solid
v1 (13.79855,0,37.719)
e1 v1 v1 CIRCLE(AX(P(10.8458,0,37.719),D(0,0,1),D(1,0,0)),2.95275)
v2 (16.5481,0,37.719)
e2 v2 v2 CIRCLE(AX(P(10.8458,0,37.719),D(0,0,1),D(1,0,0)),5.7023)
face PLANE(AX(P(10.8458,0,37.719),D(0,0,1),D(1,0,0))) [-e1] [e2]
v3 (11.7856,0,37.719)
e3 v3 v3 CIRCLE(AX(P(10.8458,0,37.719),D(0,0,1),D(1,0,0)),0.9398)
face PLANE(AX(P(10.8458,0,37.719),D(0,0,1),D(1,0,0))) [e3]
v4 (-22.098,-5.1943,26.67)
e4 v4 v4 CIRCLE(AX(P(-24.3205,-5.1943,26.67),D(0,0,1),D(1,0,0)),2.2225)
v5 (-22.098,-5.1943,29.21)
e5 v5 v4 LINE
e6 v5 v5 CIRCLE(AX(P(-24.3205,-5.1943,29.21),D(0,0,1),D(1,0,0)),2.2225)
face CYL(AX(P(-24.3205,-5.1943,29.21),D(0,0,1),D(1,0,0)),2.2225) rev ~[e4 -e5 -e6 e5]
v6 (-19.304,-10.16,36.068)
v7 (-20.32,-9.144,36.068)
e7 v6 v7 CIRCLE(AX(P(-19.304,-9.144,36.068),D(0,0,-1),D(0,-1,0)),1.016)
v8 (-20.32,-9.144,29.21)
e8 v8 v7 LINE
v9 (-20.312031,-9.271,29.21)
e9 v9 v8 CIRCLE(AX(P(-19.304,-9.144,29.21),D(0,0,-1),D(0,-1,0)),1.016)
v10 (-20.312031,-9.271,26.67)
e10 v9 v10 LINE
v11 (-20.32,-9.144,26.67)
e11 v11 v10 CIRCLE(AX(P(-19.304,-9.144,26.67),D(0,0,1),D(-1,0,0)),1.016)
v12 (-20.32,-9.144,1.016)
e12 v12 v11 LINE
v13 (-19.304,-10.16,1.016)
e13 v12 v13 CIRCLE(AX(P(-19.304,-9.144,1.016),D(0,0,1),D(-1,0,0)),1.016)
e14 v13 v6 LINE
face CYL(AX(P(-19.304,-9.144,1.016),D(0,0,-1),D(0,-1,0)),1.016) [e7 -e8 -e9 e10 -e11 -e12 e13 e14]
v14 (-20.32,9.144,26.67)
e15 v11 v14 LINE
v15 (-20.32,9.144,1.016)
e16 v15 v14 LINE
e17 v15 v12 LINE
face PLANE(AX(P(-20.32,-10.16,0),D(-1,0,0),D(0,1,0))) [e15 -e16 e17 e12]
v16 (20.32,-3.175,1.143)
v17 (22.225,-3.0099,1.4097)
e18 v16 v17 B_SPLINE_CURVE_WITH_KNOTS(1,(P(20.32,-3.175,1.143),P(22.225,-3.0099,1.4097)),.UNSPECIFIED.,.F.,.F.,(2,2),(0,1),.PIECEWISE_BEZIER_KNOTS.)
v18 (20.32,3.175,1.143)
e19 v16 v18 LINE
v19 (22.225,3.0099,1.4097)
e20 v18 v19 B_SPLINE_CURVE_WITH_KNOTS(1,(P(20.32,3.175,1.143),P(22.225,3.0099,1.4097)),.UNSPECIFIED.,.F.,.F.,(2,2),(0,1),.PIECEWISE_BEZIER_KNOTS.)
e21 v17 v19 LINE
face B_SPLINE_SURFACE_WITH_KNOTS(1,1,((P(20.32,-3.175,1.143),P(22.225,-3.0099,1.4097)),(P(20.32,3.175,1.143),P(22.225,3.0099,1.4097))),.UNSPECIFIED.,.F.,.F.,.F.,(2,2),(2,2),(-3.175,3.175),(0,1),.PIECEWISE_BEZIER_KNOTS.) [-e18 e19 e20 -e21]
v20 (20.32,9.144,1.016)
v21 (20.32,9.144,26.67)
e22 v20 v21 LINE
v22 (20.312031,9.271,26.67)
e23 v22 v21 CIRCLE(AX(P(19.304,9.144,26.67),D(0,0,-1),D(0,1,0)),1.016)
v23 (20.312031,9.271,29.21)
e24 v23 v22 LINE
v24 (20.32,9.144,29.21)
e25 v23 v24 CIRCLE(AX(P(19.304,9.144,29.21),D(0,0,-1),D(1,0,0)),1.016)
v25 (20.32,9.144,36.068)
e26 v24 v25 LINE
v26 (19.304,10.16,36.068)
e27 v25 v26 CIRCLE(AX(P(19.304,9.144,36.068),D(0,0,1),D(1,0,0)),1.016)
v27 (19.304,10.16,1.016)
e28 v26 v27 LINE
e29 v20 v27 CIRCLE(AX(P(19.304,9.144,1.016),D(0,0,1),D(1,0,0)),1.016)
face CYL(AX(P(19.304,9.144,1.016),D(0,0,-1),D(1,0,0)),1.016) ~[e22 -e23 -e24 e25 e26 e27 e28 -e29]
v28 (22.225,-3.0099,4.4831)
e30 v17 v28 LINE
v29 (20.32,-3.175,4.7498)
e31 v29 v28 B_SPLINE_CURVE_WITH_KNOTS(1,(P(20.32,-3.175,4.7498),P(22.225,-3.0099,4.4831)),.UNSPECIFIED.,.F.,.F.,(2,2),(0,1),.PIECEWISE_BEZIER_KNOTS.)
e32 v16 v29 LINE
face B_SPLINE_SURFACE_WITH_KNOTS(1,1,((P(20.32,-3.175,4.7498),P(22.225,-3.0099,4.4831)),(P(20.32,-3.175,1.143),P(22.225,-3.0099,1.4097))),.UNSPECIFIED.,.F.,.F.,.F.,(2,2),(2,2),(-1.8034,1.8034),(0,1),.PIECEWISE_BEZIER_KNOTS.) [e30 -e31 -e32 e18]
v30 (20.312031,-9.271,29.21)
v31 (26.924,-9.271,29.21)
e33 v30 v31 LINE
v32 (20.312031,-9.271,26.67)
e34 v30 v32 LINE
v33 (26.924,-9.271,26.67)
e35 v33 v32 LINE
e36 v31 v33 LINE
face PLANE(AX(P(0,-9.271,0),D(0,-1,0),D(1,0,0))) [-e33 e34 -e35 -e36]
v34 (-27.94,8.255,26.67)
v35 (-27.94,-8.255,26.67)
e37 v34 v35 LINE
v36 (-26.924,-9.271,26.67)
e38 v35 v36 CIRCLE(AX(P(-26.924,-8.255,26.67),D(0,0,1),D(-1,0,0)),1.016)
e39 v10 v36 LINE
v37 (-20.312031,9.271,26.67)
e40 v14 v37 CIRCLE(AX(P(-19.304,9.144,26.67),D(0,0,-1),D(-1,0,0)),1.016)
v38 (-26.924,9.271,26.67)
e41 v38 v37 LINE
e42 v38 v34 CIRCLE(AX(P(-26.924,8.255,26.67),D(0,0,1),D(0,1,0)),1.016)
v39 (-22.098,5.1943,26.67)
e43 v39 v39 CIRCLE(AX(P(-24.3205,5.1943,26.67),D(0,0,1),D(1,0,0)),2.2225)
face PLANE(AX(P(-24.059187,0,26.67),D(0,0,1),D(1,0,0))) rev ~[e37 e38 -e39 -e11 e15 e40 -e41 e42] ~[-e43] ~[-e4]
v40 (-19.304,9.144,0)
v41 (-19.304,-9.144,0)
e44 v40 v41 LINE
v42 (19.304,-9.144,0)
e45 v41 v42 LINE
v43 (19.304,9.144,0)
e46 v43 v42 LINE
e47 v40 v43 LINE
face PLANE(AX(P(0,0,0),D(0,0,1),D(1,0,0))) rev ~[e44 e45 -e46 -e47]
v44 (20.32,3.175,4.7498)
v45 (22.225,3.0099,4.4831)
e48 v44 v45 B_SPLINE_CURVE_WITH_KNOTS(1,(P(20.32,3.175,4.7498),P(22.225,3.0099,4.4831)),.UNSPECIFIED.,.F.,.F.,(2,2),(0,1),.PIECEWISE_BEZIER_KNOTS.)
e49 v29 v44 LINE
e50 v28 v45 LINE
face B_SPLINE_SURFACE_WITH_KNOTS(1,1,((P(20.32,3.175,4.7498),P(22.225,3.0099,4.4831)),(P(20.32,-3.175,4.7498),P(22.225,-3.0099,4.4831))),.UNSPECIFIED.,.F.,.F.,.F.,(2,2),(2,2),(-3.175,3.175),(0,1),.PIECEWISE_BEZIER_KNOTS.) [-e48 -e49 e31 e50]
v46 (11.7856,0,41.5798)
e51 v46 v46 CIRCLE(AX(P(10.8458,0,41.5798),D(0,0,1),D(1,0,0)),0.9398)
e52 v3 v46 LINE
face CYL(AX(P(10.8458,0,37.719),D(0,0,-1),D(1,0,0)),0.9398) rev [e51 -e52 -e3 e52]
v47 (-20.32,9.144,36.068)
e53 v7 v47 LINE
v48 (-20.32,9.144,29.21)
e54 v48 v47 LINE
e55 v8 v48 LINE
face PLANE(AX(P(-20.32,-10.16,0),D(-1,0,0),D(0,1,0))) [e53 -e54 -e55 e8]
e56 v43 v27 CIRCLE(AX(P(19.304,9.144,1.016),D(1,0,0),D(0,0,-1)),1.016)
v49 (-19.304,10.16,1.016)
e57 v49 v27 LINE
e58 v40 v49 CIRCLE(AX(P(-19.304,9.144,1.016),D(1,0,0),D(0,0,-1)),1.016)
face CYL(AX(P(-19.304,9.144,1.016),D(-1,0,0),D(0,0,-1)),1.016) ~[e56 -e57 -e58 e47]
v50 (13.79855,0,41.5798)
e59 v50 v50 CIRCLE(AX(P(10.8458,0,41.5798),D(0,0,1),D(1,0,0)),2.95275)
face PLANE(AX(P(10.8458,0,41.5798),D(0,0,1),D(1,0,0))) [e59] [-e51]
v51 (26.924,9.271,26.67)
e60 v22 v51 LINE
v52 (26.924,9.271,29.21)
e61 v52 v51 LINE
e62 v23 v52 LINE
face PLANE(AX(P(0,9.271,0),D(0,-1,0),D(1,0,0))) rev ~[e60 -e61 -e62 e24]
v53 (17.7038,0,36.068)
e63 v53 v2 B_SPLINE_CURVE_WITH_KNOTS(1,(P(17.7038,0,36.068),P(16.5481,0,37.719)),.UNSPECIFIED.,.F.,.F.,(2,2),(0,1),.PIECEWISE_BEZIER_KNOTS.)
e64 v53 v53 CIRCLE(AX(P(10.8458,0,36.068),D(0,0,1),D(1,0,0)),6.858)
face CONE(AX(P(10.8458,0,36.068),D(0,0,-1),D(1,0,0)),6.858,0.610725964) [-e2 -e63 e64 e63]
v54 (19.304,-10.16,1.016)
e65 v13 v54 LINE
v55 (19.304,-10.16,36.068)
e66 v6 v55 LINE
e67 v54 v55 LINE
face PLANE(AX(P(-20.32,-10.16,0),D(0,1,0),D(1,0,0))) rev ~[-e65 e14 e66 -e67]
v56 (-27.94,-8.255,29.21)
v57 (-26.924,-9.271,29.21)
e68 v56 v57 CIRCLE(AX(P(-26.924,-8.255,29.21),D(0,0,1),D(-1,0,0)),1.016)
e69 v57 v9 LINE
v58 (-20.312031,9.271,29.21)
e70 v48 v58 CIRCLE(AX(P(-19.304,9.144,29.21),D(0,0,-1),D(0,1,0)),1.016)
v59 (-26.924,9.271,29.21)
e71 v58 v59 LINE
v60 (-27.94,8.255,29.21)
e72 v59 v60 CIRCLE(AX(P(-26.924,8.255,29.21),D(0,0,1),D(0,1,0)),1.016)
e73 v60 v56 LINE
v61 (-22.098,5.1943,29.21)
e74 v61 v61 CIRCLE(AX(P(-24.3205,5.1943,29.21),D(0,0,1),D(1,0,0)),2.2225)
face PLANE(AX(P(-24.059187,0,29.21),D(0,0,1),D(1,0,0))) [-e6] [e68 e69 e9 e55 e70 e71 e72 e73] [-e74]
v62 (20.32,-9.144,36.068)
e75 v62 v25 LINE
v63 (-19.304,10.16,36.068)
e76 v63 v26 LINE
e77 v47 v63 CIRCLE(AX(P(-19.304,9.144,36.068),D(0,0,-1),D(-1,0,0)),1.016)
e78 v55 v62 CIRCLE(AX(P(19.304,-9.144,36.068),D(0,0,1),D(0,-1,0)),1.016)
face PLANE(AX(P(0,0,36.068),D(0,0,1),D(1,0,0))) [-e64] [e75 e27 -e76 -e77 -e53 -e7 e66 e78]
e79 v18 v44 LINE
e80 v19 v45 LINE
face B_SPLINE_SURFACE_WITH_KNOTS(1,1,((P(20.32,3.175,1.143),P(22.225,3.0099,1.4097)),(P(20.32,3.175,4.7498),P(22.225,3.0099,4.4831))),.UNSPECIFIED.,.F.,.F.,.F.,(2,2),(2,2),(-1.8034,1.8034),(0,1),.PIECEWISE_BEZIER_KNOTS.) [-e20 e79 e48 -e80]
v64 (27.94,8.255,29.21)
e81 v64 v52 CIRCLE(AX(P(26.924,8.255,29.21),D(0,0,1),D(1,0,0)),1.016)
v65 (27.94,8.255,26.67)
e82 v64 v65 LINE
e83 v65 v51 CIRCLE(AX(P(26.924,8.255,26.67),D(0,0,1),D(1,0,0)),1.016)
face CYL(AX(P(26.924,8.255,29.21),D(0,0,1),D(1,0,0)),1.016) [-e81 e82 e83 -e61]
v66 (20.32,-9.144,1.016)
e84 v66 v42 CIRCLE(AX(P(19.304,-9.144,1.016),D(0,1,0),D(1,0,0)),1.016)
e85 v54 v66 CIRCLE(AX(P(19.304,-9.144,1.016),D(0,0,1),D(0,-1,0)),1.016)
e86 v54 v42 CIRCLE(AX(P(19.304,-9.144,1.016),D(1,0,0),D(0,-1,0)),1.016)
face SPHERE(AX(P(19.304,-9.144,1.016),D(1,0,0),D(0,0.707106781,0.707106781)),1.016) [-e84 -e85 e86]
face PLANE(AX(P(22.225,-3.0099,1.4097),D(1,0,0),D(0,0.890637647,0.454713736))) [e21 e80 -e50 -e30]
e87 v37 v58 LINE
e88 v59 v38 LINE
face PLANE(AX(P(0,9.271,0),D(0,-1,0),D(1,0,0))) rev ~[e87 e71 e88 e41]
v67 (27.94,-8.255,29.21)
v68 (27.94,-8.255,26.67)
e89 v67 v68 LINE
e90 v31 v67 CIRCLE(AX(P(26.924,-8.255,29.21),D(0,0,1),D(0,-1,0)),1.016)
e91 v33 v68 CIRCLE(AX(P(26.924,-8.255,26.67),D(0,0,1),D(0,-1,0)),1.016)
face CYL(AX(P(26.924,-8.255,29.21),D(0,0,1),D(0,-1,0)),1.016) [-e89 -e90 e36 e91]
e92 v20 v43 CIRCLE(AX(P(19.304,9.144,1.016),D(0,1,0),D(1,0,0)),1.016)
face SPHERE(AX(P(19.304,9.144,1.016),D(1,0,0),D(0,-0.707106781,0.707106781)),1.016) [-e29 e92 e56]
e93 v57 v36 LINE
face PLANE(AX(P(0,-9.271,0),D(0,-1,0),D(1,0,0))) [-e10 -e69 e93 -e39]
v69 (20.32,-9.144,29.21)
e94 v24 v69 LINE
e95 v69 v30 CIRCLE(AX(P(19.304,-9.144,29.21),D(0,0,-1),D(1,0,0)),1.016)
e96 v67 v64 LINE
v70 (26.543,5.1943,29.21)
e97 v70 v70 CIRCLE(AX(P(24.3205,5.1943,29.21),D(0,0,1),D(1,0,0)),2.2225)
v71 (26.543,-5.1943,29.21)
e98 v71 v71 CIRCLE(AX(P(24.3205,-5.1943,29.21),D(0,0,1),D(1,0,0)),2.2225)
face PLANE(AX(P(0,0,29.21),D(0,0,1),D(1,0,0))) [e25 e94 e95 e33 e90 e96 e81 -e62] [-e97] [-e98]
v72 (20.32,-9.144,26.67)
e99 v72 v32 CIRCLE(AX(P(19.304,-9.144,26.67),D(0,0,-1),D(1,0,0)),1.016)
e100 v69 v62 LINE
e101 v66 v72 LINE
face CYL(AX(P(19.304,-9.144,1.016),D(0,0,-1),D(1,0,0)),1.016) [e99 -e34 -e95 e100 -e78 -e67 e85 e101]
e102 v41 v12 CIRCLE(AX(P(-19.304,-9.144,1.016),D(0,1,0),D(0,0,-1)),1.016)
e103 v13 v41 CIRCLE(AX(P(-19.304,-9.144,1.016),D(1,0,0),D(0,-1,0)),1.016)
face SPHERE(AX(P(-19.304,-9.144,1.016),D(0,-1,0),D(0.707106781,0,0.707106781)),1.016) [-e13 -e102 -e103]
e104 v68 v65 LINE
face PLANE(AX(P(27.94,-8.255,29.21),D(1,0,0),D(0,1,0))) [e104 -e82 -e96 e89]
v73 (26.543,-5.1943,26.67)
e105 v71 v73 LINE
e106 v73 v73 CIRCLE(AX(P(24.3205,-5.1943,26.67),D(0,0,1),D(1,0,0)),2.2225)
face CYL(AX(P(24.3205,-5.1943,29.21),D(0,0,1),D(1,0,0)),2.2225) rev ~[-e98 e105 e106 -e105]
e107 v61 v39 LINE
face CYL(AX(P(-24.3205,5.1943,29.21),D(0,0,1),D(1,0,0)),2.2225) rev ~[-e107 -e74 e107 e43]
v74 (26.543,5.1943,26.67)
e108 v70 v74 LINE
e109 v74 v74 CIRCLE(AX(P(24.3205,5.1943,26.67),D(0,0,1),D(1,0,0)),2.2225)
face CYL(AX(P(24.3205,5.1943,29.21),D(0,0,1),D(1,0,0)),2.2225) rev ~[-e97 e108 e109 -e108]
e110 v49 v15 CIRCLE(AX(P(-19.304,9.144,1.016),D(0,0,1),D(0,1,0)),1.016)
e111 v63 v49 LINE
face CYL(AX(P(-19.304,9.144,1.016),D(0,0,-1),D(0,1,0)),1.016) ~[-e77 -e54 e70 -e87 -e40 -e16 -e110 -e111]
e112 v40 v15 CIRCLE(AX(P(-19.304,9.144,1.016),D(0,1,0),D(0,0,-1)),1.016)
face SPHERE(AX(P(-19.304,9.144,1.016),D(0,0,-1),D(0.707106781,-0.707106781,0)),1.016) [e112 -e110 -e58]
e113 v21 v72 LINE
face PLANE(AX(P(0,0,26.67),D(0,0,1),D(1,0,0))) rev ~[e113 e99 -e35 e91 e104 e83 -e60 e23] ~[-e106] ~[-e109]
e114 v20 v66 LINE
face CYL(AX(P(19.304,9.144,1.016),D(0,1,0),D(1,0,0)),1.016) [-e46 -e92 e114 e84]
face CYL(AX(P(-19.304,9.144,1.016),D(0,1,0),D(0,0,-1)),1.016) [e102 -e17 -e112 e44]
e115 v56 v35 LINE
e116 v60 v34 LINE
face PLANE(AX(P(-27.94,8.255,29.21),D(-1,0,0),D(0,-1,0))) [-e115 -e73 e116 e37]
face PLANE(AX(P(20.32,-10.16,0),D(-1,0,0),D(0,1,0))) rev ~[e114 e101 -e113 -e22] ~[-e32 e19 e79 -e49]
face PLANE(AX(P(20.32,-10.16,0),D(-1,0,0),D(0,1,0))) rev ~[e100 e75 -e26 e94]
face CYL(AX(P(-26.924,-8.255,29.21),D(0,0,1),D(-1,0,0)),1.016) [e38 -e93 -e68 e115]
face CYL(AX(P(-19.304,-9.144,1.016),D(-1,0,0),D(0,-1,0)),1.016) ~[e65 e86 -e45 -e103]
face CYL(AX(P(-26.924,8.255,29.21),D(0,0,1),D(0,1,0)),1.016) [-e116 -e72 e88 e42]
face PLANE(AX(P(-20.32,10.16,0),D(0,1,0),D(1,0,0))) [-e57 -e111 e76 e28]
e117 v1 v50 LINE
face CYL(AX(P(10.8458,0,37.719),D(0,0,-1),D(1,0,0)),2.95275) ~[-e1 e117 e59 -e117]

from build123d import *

# Parameters (mm, degrees)
F0_W           = 40.64
F0_H           = 20.32
F1_DEPTH       = 36.068
F2_W           = 6.35
F2_H           = 3.6068
F4_W           = 6.0198
F4_H           = 3.0734
F7_R           = 2.2225
F8_DEPTH       = 2.54
F9_R           = 6.858
F11_R          = 5.7023
F13_T1_DEPTH   = 38.608
F13_T3_DEPTH   = 18.288
F13_S7_W       = 1.016
F13_S7_H       = 1.016
F13_T8_DEPTH   = 1.016
F13_S13_W      = 1.016
F13_S13_H      = 1.016
F13_T14_DEPTH  = 1.016
F13_S19_W      = 1.016
F13_S19_H      = 1.016
F13_T20_DEPTH  = 1.016
F13_S25_W      = 1.016
F13_S25_H      = 1.016
F13_T26_DEPTH  = 1.016
F13_T32_DEPTH  = 37.592
F13_T38_DEPTH  = 37.592
F13_T44_DEPTH  = 37.592
F13_T51_DEPTH  = 37.592
F13_T57_DEPTH  = 37.592
F13_T63_DEPTH  = 37.592
F13_T69_DEPTH  = 37.592
F13_T75_DEPTH  = 37.592
F13_T82_DEPTH  = 37.592
F13_T88_DEPTH  = 37.592
F13_T94_DEPTH  = 37.592
F13_T100_DEPTH = 37.592
F13_T106_DEPTH = 37.592
F13_T113_DEPTH = 37.592
F13_T119_DEPTH = 37.592
F13_T125_DEPTH = 37.592
F13_T131_DEPTH = 37.592
F13_T137_DEPTH = 37.592
F13_T144_DEPTH = 37.592
F13_T150_DEPTH = 37.592
F14_R          = 2.95275
F14_R_2        = 0.9398
F15_DEPTH      = 3.8608


# Not quite as in the source:
# - a fillet or chamfer that OpenCascade refuses, or shapes differently, is made with other operations: its cross-section is extruded or revolved along the edge and cut away or added


with BuildPart() as f1:
    # F0 (on Top) → F1 (new body)
    with BuildSketch(Plane.XY):
        Rectangle(F0_W, F0_H)
    extrude(amount=F1_DEPTH)

    # F2 (on face) → F5 section 0
    with BuildSketch(Plane.YZ.offset(20.32)):
        with Locations((0, 2.9464)):
            Rectangle(F2_W, F2_H)
    # F4 (on offset) → F5 section 1
    with BuildSketch(Plane.YZ.offset(22.225)):
        with Locations((0, 2.9464)):
            Rectangle(F4_W, F4_H)
    loft()

    # F7 (on offset) → F8 (join)
    with BuildSketch(Plane.XY.offset(29.21)):
        with BuildLine():
            ThreePointArc((-27.94, -8.255), (-27.6424204897, -8.9734204897), (-26.924, -9.271))
            Line((-26.924, -9.271), (-20.32, -9.271))
            Line((-20.32, -9.271), (-20.32, 9.271))
            Line((-20.32, 9.271), (-26.924, 9.271))
            ThreePointArc((-26.924, 9.271), (-27.6424204897, 8.9734204897), (-27.94, 8.255))
            Line((-27.94, 8.255), (-27.94, -8.255))
        make_face()
        with Locations((-24.3205, -5.1943)):
            Circle(F7_R, mode=Mode.SUBTRACT)
        with Locations((-24.3205, 5.1943)):
            Circle(F7_R, mode=Mode.SUBTRACT)
        with BuildLine():
            ThreePointArc((27.94, 8.255), (27.6424204897, 8.9734204897), (26.924, 9.271))
            Line((26.924, 9.271), (20.32, 9.271))
            Line((20.32, 9.271), (20.32, -9.271))
            Line((20.32, -9.271), (26.924, -9.271))
            ThreePointArc((26.924, -9.271), (27.6424204897, -8.9734204897), (27.94, -8.255))
            Line((27.94, -8.255), (27.94, 8.255))
        make_face()
        with Locations((24.3205, -5.1943)):
            Circle(F7_R, mode=Mode.SUBTRACT)
        with Locations((24.3205, 5.1943)):
            Circle(F7_R, mode=Mode.SUBTRACT)
    extrude(amount=-F8_DEPTH)

    # F9 (on face) → F12 section 0
    with BuildSketch(Plane.XY.offset(36.068)):
        with Locations((10.8458, 0)):
            Circle(F9_R)
    # F11 (on offset) → F12 section 1
    with BuildSketch(Plane.XY.offset(37.719)):
        with Locations((10.8458, 0)):
            Circle(F11_R)
    loft()

    # F13: fillet of radius 1.016 on 8 edges, made by hand

    # F13_s2 → F13_t1 (cut)
    with BuildSketch(Plane.YZ.offset(-19.304)):
        with BuildLine():
            ThreePointArc((-10.16, 1.016), (-9.8624204897, 0.2975795103), (-9.144, 0))
            Line((-9.144, 0), (-10.16, 0))
            Line((-10.16, 0), (-10.16, 1.016))
        make_face()
        with BuildLine():
            ThreePointArc((9.144, 0), (9.8624204897, 0.2975795103), (10.16, 1.016))
            Line((10.16, 1.016), (10.16, 0))
            Line((10.16, 0), (9.144, 0))
        make_face()
    extrude(amount=F13_T1_DEPTH, mode=Mode.SUBTRACT)

    # F13_s4 → F13_t3 (cut)
    with BuildSketch(Plane.XZ.offset(-9.144)):
        with BuildLine():
            ThreePointArc((20.32, 1.016), (20.0224204897, 0.2975795103), (19.304, 0))
            Line((19.304, 0), (20.32, 0))
            Line((20.32, 0), (20.32, 1.016))
        make_face()
        with BuildLine():
            ThreePointArc((-19.304, 0), (-20.0224204897, 0.2975795103), (-20.32, 1.016))
            Line((-20.32, 1.016), (-20.32, 0))
            Line((-20.32, 0), (-19.304, 0))
        make_face()
    extrude(amount=F13_T3_DEPTH, mode=Mode.SUBTRACT)


with BuildPart() as f13_tool6:
    # F13_s7 → F13_t8 (new body)
    with BuildSketch(Plane.YZ.offset(19.304)):
        with Locations((-9.652, 0.508)):
            Rectangle(F13_S7_W, F13_S7_H)
    extrude(amount=F13_T8_DEPTH)

    # F13_s9 → F13_t10 (revolve, cut)
    with BuildSketch(Plane(origin=(19.304, -9.144, 1.016), x_dir=(0, 0.7071067812, 0.7071067812), z_dir=(0, 0.7071067812, -0.7071067812))):
        with BuildLine():
            ThreePointArc((0, -1.016), (1.016, 0), (0, 1.016))
            Line((0, 1.016), (0, -1.016))
        make_face()
    revolve(axis=Axis((19.304, -9.144, 1.016), (1, 0, 0)), mode=Mode.SUBTRACT)


with BuildPart() as f1_1:
    add(f1.part)

    # F13_t5: cut F13_tool6
    add(f13_tool6.part, mode=Mode.SUBTRACT)


with BuildPart() as f13_tool12:
    # F13_s13 → F13_t14 (new body)
    with BuildSketch(Plane.YZ.offset(19.304)):
        with Locations((9.652, 0.508)):
            Rectangle(F13_S13_W, F13_S13_H)
    extrude(amount=F13_T14_DEPTH)

    # F13_s15 → F13_t16 (revolve, cut)
    with BuildSketch(Plane(origin=(19.304, 9.144, 1.016), x_dir=(0, -0.7071067812, 0.7071067812), z_dir=(0, 0.7071067812, 0.7071067812))):
        with BuildLine():
            ThreePointArc((0, -1.016), (1.016, 0), (0, 1.016))
            Line((0, 1.016), (0, -1.016))
        make_face()
    revolve(axis=Axis((19.304, 9.144, 1.016), (1, 0, 0)), mode=Mode.SUBTRACT)


with BuildPart() as f1_2:
    add(f1_1.part)

    # F13_t11: cut F13_tool12
    add(f13_tool12.part, mode=Mode.SUBTRACT)


with BuildPart() as f13_tool18:
    # F13_s19 → F13_t20 (new body)
    with BuildSketch(Plane.XY.offset(1.016)):
        with Locations((-19.812, 9.652)):
            Rectangle(F13_S19_W, F13_S19_H)
    extrude(amount=-F13_T20_DEPTH)

    # F13_s21 → F13_t22 (revolve, cut)
    with BuildSketch(Plane(origin=(-19.304, 9.144, 1.016), x_dir=(0.7071067812, -0.7071067812, 0), z_dir=(0.7071067812, 0.7071067812, 0))):
        with BuildLine():
            ThreePointArc((0, -1.016), (1.016, 0), (0, 1.016))
            Line((0, 1.016), (0, -1.016))
        make_face()
    revolve(axis=Axis((-19.304, 9.144, 1.016), (0, 0, -1)), mode=Mode.SUBTRACT)


with BuildPart() as f1_3:
    add(f1_2.part)

    # F13_t17: cut F13_tool18
    add(f13_tool18.part, mode=Mode.SUBTRACT)


with BuildPart() as f13_tool24:
    # F13_s25 → F13_t26 (new body)
    with BuildSketch(Plane.XZ.offset(9.144)):
        with Locations((-19.812, 0.508)):
            Rectangle(F13_S25_W, F13_S25_H)
    extrude(amount=F13_T26_DEPTH)

    # F13_s27 → F13_t28 (revolve, cut)
    with BuildSketch(Plane(origin=(-19.304, -9.144, 1.016), x_dir=(0.7071067812, 0, 0.7071067812), z_dir=(0.7071067812, 0, -0.7071067812))):
        with BuildLine():
            ThreePointArc((0, -1.016), (1.016, 0), (0, 1.016))
            Line((0, 1.016), (0, -1.016))
        make_face()
    revolve(axis=Axis((-19.304, -9.144, 1.016), (0, -1, 0)), mode=Mode.SUBTRACT)


with BuildPart() as f1_4:
    add(f1_3.part)

    # F13_t23: cut F13_tool24
    add(f13_tool24.part, mode=Mode.SUBTRACT)


with BuildPart() as f13_tool30:
    # F13_s31 → F13_t32 (new body)
    with BuildSketch(Plane.XY.offset(1.016)):
        with BuildLine():
            ThreePointArc((20.32, -9.144), (20.0224204897, -9.8624204897), (19.304, -10.16))
            Line((19.304, -10.16), (20.32, -10.16))
            Line((20.32, -10.16), (20.32, -9.144))
        make_face()
    extrude(amount=F13_T32_DEPTH)

    split(bisect_by=Plane.XY.offset(26.67), keep=Keep.BOTTOM)

    split(bisect_by=Plane.XZ.offset(9.271), keep=Keep.BOTTOM)


with BuildPart() as f1_5:
    add(f1_4.part)

    # F13_t29: cut F13_tool30
    add(f13_tool30.part, mode=Mode.SUBTRACT)


with BuildPart() as f13_tool36:
    # F13_s37 → F13_t38 (new body)
    with BuildSketch(Plane.XY.offset(1.016)):
        with BuildLine():
            ThreePointArc((20.32, -9.144), (20.0224204897, -9.8624204897), (19.304, -10.16))
            Line((19.304, -10.16), (20.32, -10.16))
            Line((20.32, -10.16), (20.32, -9.144))
        make_face()
    extrude(amount=F13_T38_DEPTH)

    split(bisect_by=Plane.XY.offset(26.67), keep=Keep.BOTTOM)

    split(bisect_by=Plane.XZ.offset(9.271), keep=Keep.TOP)


with BuildPart() as f1_6:
    add(f1_5.part)

    # F13_t35: cut F13_tool36
    add(f13_tool36.part, mode=Mode.SUBTRACT)


with BuildPart() as f13_tool42:
    # F13_s43 → F13_t44 (new body)
    with BuildSketch(Plane.XY.offset(1.016)):
        with BuildLine():
            ThreePointArc((20.32, -9.144), (20.0224204897, -9.8624204897), (19.304, -10.16))
            Line((19.304, -10.16), (20.32, -10.16))
            Line((20.32, -10.16), (20.32, -9.144))
        make_face()
    extrude(amount=F13_T44_DEPTH)

    split(bisect_by=Plane.XY.offset(26.67), keep=Keep.TOP)

    split(bisect_by=Plane.XZ.offset(9.271), keep=Keep.TOP)

    split(bisect_by=Plane.XY.offset(29.21), keep=Keep.BOTTOM)


with BuildPart() as f1_7:
    add(f1_6.part)

    # F13_t41: cut F13_tool42
    add(f13_tool42.part, mode=Mode.SUBTRACT)


with BuildPart() as f13_tool49:
    # F13_s50 → F13_t51 (new body)
    with BuildSketch(Plane.XY.offset(1.016)):
        with BuildLine():
            ThreePointArc((20.32, -9.144), (20.0224204897, -9.8624204897), (19.304, -10.16))
            Line((19.304, -10.16), (20.32, -10.16))
            Line((20.32, -10.16), (20.32, -9.144))
        make_face()
    extrude(amount=F13_T51_DEPTH)

    split(bisect_by=Plane.XZ.offset(9.271), keep=Keep.BOTTOM)

    split(bisect_by=Plane.XY.offset(29.21), keep=Keep.TOP)


with BuildPart() as f1_8:
    add(f1_7.part)

    # F13_t48: cut F13_tool49
    add(f13_tool49.part, mode=Mode.SUBTRACT)


with BuildPart() as f13_tool55:
    # F13_s56 → F13_t57 (new body)
    with BuildSketch(Plane.XY.offset(1.016)):
        with BuildLine():
            ThreePointArc((20.32, -9.144), (20.0224204897, -9.8624204897), (19.304, -10.16))
            Line((19.304, -10.16), (20.32, -10.16))
            Line((20.32, -10.16), (20.32, -9.144))
        make_face()
    extrude(amount=F13_T57_DEPTH)

    split(bisect_by=Plane.XZ.offset(9.271), keep=Keep.TOP)

    split(bisect_by=Plane.XY.offset(29.21), keep=Keep.TOP)


with BuildPart() as f1_9:
    add(f1_8.part)

    # F13_t54: cut F13_tool55
    add(f13_tool55.part, mode=Mode.SUBTRACT)


with BuildPart() as f13_tool61:
    # F13_s62 → F13_t63 (new body)
    with BuildSketch(Plane.XY.offset(1.016)):
        with BuildLine():
            ThreePointArc((20.32, 9.144), (20.0224204897, 9.8624204897), (19.304, 10.16))
            Line((19.304, 10.16), (20.32, 10.16))
            Line((20.32, 10.16), (20.32, 9.144))
        make_face()
    extrude(amount=F13_T63_DEPTH)

    split(bisect_by=Plane.XZ.offset(-9.271), keep=Keep.TOP)

    split(bisect_by=Plane.XY.offset(26.67), keep=Keep.BOTTOM)


with BuildPart() as f1_10:
    add(f1_9.part)

    # F13_t60: cut F13_tool61
    add(f13_tool61.part, mode=Mode.SUBTRACT)


with BuildPart() as f13_tool67:
    # F13_s68 → F13_t69 (new body)
    with BuildSketch(Plane.XY.offset(1.016)):
        with BuildLine():
            ThreePointArc((20.32, 9.144), (20.0224204897, 9.8624204897), (19.304, 10.16))
            Line((19.304, 10.16), (20.32, 10.16))
            Line((20.32, 10.16), (20.32, 9.144))
        make_face()
    extrude(amount=F13_T69_DEPTH)

    split(bisect_by=Plane.XZ.offset(-9.271), keep=Keep.BOTTOM)

    split(bisect_by=Plane.XY.offset(26.67), keep=Keep.BOTTOM)


with BuildPart() as f1_11:
    add(f1_10.part)

    # F13_t66: cut F13_tool67
    add(f13_tool67.part, mode=Mode.SUBTRACT)


with BuildPart() as f13_tool73:
    # F13_s74 → F13_t75 (new body)
    with BuildSketch(Plane.XY.offset(1.016)):
        with BuildLine():
            ThreePointArc((20.32, 9.144), (20.0224204897, 9.8624204897), (19.304, 10.16))
            Line((19.304, 10.16), (20.32, 10.16))
            Line((20.32, 10.16), (20.32, 9.144))
        make_face()
    extrude(amount=F13_T75_DEPTH)

    split(bisect_by=Plane.XZ.offset(-9.271), keep=Keep.BOTTOM)

    split(bisect_by=Plane.XY.offset(26.67), keep=Keep.TOP)

    split(bisect_by=Plane.XY.offset(29.21), keep=Keep.BOTTOM)


with BuildPart() as f1_12:
    add(f1_11.part)

    # F13_t72: cut F13_tool73
    add(f13_tool73.part, mode=Mode.SUBTRACT)


with BuildPart() as f13_tool80:
    # F13_s81 → F13_t82 (new body)
    with BuildSketch(Plane.XY.offset(1.016)):
        with BuildLine():
            ThreePointArc((20.32, 9.144), (20.0224204897, 9.8624204897), (19.304, 10.16))
            Line((19.304, 10.16), (20.32, 10.16))
            Line((20.32, 10.16), (20.32, 9.144))
        make_face()
    extrude(amount=F13_T82_DEPTH)

    split(bisect_by=Plane.XZ.offset(-9.271), keep=Keep.TOP)

    split(bisect_by=Plane.XY.offset(29.21), keep=Keep.TOP)


with BuildPart() as f1_13:
    add(f1_12.part)

    # F13_t79: cut F13_tool80
    add(f13_tool80.part, mode=Mode.SUBTRACT)


with BuildPart() as f13_tool86:
    # F13_s87 → F13_t88 (new body)
    with BuildSketch(Plane.XY.offset(1.016)):
        with BuildLine():
            ThreePointArc((20.32, 9.144), (20.0224204897, 9.8624204897), (19.304, 10.16))
            Line((19.304, 10.16), (20.32, 10.16))
            Line((20.32, 10.16), (20.32, 9.144))
        make_face()
    extrude(amount=F13_T88_DEPTH)

    split(bisect_by=Plane.XZ.offset(-9.271), keep=Keep.BOTTOM)

    split(bisect_by=Plane.XY.offset(29.21), keep=Keep.TOP)


with BuildPart() as f1_14:
    add(f1_13.part)

    # F13_t85: cut F13_tool86
    add(f13_tool86.part, mode=Mode.SUBTRACT)


with BuildPart() as f13_tool92:
    # F13_s93 → F13_t94 (new body)
    with BuildSketch(Plane.XY.offset(1.016)):
        with BuildLine():
            ThreePointArc((-19.304, 10.16), (-20.0224204897, 9.8624204897), (-20.32, 9.144))
            Line((-20.32, 9.144), (-20.32, 10.16))
            Line((-20.32, 10.16), (-19.304, 10.16))
        make_face()
    extrude(amount=F13_T94_DEPTH)

    split(bisect_by=Plane.XY.offset(26.67), keep=Keep.BOTTOM)

    split(bisect_by=Plane.XZ.offset(-9.271), keep=Keep.BOTTOM)


with BuildPart() as f1_15:
    add(f1_14.part)

    # F13_t91: cut F13_tool92
    add(f13_tool92.part, mode=Mode.SUBTRACT)


with BuildPart() as f13_tool98:
    # F13_s99 → F13_t100 (new body)
    with BuildSketch(Plane.XY.offset(1.016)):
        with BuildLine():
            ThreePointArc((-19.304, 10.16), (-20.0224204897, 9.8624204897), (-20.32, 9.144))
            Line((-20.32, 9.144), (-20.32, 10.16))
            Line((-20.32, 10.16), (-19.304, 10.16))
        make_face()
    extrude(amount=F13_T100_DEPTH)

    split(bisect_by=Plane.XY.offset(26.67), keep=Keep.BOTTOM)

    split(bisect_by=Plane.XZ.offset(-9.271), keep=Keep.TOP)


with BuildPart() as f1_16:
    add(f1_15.part)

    # F13_t97: cut F13_tool98
    add(f13_tool98.part, mode=Mode.SUBTRACT)


with BuildPart() as f13_tool104:
    # F13_s105 → F13_t106 (new body)
    with BuildSketch(Plane.XY.offset(1.016)):
        with BuildLine():
            ThreePointArc((-19.304, 10.16), (-20.0224204897, 9.8624204897), (-20.32, 9.144))
            Line((-20.32, 9.144), (-20.32, 10.16))
            Line((-20.32, 10.16), (-19.304, 10.16))
        make_face()
    extrude(amount=F13_T106_DEPTH)

    split(bisect_by=Plane.XY.offset(26.67), keep=Keep.TOP)

    split(bisect_by=Plane.XZ.offset(-9.271), keep=Keep.BOTTOM)

    split(bisect_by=Plane.XY.offset(29.21), keep=Keep.BOTTOM)


with BuildPart() as f1_17:
    add(f1_16.part)

    # F13_t103: cut F13_tool104
    add(f13_tool104.part, mode=Mode.SUBTRACT)


with BuildPart() as f13_tool111:
    # F13_s112 → F13_t113 (new body)
    with BuildSketch(Plane.XY.offset(1.016)):
        with BuildLine():
            ThreePointArc((-19.304, 10.16), (-20.0224204897, 9.8624204897), (-20.32, 9.144))
            Line((-20.32, 9.144), (-20.32, 10.16))
            Line((-20.32, 10.16), (-19.304, 10.16))
        make_face()
    extrude(amount=F13_T113_DEPTH)

    split(bisect_by=Plane.XZ.offset(-9.271), keep=Keep.BOTTOM)

    split(bisect_by=Plane.XY.offset(29.21), keep=Keep.TOP)


with BuildPart() as f1_18:
    add(f1_17.part)

    # F13_t110: cut F13_tool111
    add(f13_tool111.part, mode=Mode.SUBTRACT)


with BuildPart() as f13_tool117:
    # F13_s118 → F13_t119 (new body)
    with BuildSketch(Plane.XY.offset(1.016)):
        with BuildLine():
            ThreePointArc((-19.304, 10.16), (-20.0224204897, 9.8624204897), (-20.32, 9.144))
            Line((-20.32, 9.144), (-20.32, 10.16))
            Line((-20.32, 10.16), (-19.304, 10.16))
        make_face()
    extrude(amount=F13_T119_DEPTH)

    split(bisect_by=Plane.XZ.offset(-9.271), keep=Keep.TOP)

    split(bisect_by=Plane.XY.offset(29.21), keep=Keep.TOP)


with BuildPart() as f1_19:
    add(f1_18.part)

    # F13_t116: cut F13_tool117
    add(f13_tool117.part, mode=Mode.SUBTRACT)


with BuildPart() as f13_tool123:
    # F13_s124 → F13_t125 (new body)
    with BuildSketch(Plane.XY.offset(1.016)):
        with BuildLine():
            ThreePointArc((-19.304, -10.16), (-20.0224204897, -9.8624204897), (-20.32, -9.144))
            Line((-20.32, -9.144), (-20.32, -10.16))
            Line((-20.32, -10.16), (-19.304, -10.16))
        make_face()
    extrude(amount=F13_T125_DEPTH)

    split(bisect_by=Plane.XZ.offset(9.271), keep=Keep.TOP)

    split(bisect_by=Plane.XY.offset(26.67), keep=Keep.BOTTOM)


with BuildPart() as f1_20:
    add(f1_19.part)

    # F13_t122: cut F13_tool123
    add(f13_tool123.part, mode=Mode.SUBTRACT)


with BuildPart() as f13_tool129:
    # F13_s130 → F13_t131 (new body)
    with BuildSketch(Plane.XY.offset(1.016)):
        with BuildLine():
            ThreePointArc((-19.304, -10.16), (-20.0224204897, -9.8624204897), (-20.32, -9.144))
            Line((-20.32, -9.144), (-20.32, -10.16))
            Line((-20.32, -10.16), (-19.304, -10.16))
        make_face()
    extrude(amount=F13_T131_DEPTH)

    split(bisect_by=Plane.XZ.offset(9.271), keep=Keep.BOTTOM)

    split(bisect_by=Plane.XY.offset(26.67), keep=Keep.BOTTOM)


with BuildPart() as f1_21:
    add(f1_20.part)

    # F13_t128: cut F13_tool129
    add(f13_tool129.part, mode=Mode.SUBTRACT)


with BuildPart() as f13_tool135:
    # F13_s136 → F13_t137 (new body)
    with BuildSketch(Plane.XY.offset(1.016)):
        with BuildLine():
            ThreePointArc((-19.304, -10.16), (-20.0224204897, -9.8624204897), (-20.32, -9.144))
            Line((-20.32, -9.144), (-20.32, -10.16))
            Line((-20.32, -10.16), (-19.304, -10.16))
        make_face()
    extrude(amount=F13_T137_DEPTH)

    split(bisect_by=Plane.XZ.offset(9.271), keep=Keep.TOP)

    split(bisect_by=Plane.XY.offset(26.67), keep=Keep.TOP)

    split(bisect_by=Plane.XY.offset(29.21), keep=Keep.BOTTOM)


with BuildPart() as f1_22:
    add(f1_21.part)

    # F13_t134: cut F13_tool135
    add(f13_tool135.part, mode=Mode.SUBTRACT)


with BuildPart() as f13_tool142:
    # F13_s143 → F13_t144 (new body)
    with BuildSketch(Plane.XY.offset(1.016)):
        with BuildLine():
            ThreePointArc((-19.304, -10.16), (-20.0224204897, -9.8624204897), (-20.32, -9.144))
            Line((-20.32, -9.144), (-20.32, -10.16))
            Line((-20.32, -10.16), (-19.304, -10.16))
        make_face()
    extrude(amount=F13_T144_DEPTH)

    split(bisect_by=Plane.XZ.offset(9.271), keep=Keep.TOP)

    split(bisect_by=Plane.XY.offset(29.21), keep=Keep.TOP)


with BuildPart() as f1_23:
    add(f1_22.part)

    # F13_t141: cut F13_tool142
    add(f13_tool142.part, mode=Mode.SUBTRACT)


with BuildPart() as f13_tool148:
    # F13_s149 → F13_t150 (new body)
    with BuildSketch(Plane.XY.offset(1.016)):
        with BuildLine():
            ThreePointArc((-19.304, -10.16), (-20.0224204897, -9.8624204897), (-20.32, -9.144))
            Line((-20.32, -9.144), (-20.32, -10.16))
            Line((-20.32, -10.16), (-19.304, -10.16))
        make_face()
    extrude(amount=F13_T150_DEPTH)

    split(bisect_by=Plane.XZ.offset(9.271), keep=Keep.BOTTOM)

    split(bisect_by=Plane.XY.offset(29.21), keep=Keep.TOP)


with BuildPart() as f1_24:
    add(f1_23.part)

    # F13_t147: cut F13_tool148
    add(f13_tool148.part, mode=Mode.SUBTRACT)

    # F14 (on face) → F15 (join)
    with BuildSketch(Plane.XY.offset(37.719)):
        with Locations((10.8458, 0)):
            Circle(F14_R)
        with Locations((10.8458, 0)):
            Circle(F14_R_2, mode=Mode.SUBTRACT)
    extrude(amount=F15_DEPTH)


solid = f1_24.part
